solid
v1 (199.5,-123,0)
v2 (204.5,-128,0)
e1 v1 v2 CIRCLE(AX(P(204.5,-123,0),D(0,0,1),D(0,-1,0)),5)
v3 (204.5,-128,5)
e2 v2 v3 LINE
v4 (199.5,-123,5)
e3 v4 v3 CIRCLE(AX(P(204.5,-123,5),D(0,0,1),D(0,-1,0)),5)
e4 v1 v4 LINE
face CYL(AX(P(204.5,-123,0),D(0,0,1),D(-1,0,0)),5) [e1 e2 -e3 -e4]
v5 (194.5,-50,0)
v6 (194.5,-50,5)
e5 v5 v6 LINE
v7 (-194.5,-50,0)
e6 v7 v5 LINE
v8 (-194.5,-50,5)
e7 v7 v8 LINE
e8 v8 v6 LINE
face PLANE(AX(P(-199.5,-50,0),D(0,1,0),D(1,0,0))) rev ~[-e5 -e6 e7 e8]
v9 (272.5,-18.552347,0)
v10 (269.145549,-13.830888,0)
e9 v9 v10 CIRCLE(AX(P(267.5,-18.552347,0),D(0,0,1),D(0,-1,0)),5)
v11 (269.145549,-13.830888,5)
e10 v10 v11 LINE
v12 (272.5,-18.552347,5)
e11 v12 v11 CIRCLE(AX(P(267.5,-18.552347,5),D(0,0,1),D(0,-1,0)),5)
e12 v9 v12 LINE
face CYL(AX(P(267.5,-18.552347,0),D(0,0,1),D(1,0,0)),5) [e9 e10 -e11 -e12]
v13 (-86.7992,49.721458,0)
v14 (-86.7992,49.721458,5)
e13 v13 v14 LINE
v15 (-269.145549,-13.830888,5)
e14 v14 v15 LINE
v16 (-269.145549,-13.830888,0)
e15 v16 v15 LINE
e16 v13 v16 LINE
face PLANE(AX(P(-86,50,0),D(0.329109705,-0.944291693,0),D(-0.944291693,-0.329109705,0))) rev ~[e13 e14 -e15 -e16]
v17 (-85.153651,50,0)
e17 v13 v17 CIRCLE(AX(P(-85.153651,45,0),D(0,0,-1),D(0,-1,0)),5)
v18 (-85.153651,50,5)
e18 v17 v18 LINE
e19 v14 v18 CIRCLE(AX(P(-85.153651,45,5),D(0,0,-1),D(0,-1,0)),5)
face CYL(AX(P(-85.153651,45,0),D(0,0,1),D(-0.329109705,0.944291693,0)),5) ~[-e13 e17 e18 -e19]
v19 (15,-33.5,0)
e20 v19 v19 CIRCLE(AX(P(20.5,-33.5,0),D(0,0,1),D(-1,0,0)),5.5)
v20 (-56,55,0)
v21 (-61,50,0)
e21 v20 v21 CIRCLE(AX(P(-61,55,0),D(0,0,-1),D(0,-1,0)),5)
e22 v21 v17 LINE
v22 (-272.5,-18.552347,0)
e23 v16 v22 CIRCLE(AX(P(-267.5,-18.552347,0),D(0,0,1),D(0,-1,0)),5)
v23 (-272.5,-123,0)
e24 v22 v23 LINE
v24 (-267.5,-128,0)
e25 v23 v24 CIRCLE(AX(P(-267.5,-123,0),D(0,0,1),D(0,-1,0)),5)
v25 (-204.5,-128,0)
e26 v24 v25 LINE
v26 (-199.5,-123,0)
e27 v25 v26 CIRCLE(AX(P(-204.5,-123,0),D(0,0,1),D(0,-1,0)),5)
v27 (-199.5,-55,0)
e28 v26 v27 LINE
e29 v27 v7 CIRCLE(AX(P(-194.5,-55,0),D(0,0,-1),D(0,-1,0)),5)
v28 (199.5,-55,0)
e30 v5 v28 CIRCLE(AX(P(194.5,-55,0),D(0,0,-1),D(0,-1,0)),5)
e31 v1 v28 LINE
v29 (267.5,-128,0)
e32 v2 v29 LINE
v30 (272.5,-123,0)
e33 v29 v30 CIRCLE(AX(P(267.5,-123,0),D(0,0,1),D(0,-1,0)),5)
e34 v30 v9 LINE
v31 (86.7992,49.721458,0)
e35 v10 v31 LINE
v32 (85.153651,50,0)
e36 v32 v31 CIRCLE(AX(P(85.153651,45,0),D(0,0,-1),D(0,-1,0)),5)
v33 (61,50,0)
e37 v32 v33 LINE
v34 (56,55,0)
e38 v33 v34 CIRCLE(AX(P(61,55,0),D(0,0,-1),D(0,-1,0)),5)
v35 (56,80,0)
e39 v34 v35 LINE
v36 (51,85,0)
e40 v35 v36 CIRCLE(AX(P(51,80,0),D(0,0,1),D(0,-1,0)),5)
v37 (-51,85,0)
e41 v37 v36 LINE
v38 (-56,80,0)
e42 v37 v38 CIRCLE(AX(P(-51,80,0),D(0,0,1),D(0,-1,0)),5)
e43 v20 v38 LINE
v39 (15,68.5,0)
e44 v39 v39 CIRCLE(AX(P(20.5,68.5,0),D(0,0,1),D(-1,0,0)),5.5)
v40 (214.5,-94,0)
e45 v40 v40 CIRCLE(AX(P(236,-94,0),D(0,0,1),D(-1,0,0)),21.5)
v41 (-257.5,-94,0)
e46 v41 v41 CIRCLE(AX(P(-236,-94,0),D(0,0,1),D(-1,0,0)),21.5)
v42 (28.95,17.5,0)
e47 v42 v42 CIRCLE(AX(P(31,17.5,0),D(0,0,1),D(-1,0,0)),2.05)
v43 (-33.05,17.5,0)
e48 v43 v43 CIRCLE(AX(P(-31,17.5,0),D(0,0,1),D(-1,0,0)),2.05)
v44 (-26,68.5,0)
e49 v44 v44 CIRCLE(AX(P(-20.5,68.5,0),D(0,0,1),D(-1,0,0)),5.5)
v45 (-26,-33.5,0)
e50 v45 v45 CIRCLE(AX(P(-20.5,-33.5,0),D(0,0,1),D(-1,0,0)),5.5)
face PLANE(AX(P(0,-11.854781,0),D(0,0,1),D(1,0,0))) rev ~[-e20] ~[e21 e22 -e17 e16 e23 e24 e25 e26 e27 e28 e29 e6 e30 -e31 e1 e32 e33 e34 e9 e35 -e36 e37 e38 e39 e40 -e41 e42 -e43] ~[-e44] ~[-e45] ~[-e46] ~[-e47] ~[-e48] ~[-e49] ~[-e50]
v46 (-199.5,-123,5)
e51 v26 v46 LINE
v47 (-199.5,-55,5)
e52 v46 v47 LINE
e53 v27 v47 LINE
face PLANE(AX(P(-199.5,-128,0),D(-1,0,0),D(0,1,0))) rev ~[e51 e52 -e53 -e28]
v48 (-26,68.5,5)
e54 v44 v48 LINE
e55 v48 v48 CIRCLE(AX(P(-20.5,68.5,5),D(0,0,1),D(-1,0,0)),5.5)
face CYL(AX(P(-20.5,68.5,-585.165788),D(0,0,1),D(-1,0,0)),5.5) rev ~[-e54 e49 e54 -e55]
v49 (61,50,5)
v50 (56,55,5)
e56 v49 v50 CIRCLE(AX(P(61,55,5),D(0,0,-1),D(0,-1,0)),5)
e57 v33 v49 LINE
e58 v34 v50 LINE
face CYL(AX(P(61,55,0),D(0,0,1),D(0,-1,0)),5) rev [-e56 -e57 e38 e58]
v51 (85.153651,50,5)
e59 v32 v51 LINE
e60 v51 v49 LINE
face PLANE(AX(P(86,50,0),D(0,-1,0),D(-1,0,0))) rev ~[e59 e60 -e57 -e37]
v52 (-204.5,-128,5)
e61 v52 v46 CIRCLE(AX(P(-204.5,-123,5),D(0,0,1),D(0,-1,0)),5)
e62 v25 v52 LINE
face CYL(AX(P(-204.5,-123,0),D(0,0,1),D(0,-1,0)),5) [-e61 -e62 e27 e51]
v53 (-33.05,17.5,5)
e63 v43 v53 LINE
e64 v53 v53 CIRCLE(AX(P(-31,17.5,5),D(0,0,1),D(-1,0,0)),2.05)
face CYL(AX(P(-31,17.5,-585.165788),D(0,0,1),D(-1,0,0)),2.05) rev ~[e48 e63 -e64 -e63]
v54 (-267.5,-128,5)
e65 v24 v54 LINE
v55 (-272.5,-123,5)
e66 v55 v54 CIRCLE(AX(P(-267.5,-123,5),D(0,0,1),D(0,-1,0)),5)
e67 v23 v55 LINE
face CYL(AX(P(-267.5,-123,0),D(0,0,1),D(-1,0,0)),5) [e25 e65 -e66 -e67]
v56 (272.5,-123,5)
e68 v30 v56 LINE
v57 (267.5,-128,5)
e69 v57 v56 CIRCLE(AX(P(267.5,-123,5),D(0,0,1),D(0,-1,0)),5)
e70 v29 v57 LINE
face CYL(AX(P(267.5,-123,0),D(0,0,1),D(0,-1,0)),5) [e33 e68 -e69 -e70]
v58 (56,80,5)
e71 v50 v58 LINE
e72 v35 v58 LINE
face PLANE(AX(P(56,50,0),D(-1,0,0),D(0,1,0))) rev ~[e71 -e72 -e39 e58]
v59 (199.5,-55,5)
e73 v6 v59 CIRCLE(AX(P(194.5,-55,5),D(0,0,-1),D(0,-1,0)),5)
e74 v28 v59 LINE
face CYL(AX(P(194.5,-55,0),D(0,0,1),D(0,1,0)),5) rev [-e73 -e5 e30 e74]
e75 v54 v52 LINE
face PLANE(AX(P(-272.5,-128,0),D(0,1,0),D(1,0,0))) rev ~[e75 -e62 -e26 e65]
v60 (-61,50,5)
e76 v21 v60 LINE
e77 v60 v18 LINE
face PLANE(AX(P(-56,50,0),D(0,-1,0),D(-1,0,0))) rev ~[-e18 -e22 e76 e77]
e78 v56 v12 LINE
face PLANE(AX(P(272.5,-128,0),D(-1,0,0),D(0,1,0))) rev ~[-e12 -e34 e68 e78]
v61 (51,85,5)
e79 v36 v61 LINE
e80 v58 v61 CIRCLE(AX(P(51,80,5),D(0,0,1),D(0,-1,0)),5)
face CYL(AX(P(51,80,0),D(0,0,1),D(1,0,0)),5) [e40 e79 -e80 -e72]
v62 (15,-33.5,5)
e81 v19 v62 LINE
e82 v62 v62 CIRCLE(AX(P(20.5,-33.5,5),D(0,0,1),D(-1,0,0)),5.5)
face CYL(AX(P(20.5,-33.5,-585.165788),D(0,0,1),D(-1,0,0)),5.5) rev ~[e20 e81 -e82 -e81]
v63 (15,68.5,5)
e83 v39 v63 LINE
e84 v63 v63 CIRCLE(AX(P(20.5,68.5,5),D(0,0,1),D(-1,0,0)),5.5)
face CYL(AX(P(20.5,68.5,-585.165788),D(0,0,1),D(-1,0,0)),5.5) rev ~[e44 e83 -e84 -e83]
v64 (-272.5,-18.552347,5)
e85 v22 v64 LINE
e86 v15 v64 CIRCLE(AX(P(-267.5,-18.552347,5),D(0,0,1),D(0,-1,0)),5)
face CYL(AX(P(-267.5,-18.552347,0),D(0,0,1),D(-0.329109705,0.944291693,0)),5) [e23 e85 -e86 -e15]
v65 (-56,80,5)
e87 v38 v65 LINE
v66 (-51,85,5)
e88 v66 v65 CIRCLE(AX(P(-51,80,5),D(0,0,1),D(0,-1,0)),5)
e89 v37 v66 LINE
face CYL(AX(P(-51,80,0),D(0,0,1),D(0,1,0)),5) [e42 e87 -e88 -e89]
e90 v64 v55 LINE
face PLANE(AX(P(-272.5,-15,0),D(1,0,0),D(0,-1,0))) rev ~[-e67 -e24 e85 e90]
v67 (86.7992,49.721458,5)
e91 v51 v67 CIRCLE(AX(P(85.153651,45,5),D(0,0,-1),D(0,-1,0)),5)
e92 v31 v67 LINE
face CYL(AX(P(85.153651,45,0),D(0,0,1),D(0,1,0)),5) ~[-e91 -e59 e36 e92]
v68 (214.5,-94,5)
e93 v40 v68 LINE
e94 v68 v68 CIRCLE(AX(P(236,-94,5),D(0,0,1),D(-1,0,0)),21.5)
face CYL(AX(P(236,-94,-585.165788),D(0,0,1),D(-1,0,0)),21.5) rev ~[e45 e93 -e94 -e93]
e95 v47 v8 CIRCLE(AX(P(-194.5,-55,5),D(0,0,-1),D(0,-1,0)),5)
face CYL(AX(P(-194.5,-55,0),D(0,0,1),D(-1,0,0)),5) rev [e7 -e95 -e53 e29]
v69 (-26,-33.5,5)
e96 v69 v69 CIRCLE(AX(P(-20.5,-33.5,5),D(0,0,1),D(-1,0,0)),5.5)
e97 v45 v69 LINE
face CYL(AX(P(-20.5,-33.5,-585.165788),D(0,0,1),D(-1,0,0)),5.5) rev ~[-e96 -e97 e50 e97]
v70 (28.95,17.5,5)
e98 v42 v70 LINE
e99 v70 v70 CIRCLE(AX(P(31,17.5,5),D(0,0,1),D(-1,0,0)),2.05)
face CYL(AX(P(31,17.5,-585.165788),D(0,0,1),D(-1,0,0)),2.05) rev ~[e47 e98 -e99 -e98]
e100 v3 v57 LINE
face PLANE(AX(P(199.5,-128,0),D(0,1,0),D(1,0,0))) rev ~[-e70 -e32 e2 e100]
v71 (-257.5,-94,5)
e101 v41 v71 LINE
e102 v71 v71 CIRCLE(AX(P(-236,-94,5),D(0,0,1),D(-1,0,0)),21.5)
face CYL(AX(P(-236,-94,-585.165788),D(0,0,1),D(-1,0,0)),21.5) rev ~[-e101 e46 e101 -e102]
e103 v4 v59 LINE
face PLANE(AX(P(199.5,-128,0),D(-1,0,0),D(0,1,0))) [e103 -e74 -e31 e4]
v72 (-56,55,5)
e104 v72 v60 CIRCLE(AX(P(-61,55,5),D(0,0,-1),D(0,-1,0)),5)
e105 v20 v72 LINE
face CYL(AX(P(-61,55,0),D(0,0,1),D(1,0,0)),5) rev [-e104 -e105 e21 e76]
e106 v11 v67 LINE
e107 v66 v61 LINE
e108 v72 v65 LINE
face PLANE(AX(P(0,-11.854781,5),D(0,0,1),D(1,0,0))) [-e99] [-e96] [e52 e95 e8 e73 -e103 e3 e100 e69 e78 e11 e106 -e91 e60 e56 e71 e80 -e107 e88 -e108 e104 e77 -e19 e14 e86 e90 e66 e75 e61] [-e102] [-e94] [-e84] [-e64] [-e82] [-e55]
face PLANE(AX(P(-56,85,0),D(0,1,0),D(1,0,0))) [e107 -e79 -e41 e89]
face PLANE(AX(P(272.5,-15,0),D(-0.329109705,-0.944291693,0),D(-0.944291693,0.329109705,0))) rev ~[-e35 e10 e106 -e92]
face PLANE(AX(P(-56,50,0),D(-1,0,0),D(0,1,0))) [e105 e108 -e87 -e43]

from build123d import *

# Parameters (mm, degrees)
F0_W     = 73
F0_H     = 78
F0_W_2   = 112
F0_H_2   = 35
F1_DEPTH = 5
F2_R     = 5
F3_R     = 5
F6_D     = 4.1
F8_D     = 43
F9_D     = 11


# Not quite as in the source:
# - a feature names something its author has since deleted; it is built from what else it names


with BuildPart() as f1:
    # F0 (on Top) → F1 (new body)
    with BuildSketch(Plane.XY):
        Polygon((-56, 50), (-86, 50), (-272.5, -15), (-272.5, -50), (-199.5, -50), (199.5, -50), (272.5, -50), (272.5, -15), (86, 50), (56, 50), align=None)
        with Locations((-236, -89)):
            Rectangle(F0_W, F0_H)
        with Locations((236, -89)):
            Rectangle(F0_W, F0_H)
        with Locations((0, 67.5)):
            Rectangle(F0_W_2, F0_H_2)
    extrude(amount=F1_DEPTH)

    # F2
    f2_edges = [f1.edges().sort_by_distance(p)[0] for p in [
        (-272.5, -128, 2.5),
        (-199.5, -128, 2.5),
        (199.5, -128, 2.5),
        (272.5, -128, 2.5),
        (272.5, -15, 2.5),
        (-272.5, -15, 2.5),
        (-199.5, -50, 2.5),
        (199.5, -50, 2.5),
        (-56, 50, 2.5),
        (-56, 85, 2.5),
        (56, 85, 2.5),
        (56, 50, 2.5),
    ]]
    fillet(f2_edges, radius=F2_R)

    # F3
    f3_edges = [f1.edges().sort_by_distance(p)[0] for p in [
        (86, 50, 2.5),
        (-86, 50, 2.5),
    ]]
    fillet(f3_edges, radius=F3_R)

    # F6 (through all)
    with Locations(Plane(origin=(0, 0, 0), x_dir=(1, 0, 0), z_dir=(0, 0, -1))):
        with Locations((-31, -17.5), (31, -17.5)):
            Hole(F6_D / 2)

    # F8 (through all)
    with Locations(Plane(origin=(0, 0, 0), x_dir=(1, 0, 0), z_dir=(0, 0, -1))):
        with Locations((-236, 94), (236, 94)):
            Hole(F8_D / 2)

    # F9 (through all)
    with Locations(Plane(origin=(0, 0, 0), x_dir=(1, 0, 0), z_dir=(0, 0, -1))):
        with Locations((-20.5, -68.5), (20.5, -68.5), (-20.5, 33.5), (20.5, 33.5)):
            Hole(F9_D / 2)


solid = f1.part
